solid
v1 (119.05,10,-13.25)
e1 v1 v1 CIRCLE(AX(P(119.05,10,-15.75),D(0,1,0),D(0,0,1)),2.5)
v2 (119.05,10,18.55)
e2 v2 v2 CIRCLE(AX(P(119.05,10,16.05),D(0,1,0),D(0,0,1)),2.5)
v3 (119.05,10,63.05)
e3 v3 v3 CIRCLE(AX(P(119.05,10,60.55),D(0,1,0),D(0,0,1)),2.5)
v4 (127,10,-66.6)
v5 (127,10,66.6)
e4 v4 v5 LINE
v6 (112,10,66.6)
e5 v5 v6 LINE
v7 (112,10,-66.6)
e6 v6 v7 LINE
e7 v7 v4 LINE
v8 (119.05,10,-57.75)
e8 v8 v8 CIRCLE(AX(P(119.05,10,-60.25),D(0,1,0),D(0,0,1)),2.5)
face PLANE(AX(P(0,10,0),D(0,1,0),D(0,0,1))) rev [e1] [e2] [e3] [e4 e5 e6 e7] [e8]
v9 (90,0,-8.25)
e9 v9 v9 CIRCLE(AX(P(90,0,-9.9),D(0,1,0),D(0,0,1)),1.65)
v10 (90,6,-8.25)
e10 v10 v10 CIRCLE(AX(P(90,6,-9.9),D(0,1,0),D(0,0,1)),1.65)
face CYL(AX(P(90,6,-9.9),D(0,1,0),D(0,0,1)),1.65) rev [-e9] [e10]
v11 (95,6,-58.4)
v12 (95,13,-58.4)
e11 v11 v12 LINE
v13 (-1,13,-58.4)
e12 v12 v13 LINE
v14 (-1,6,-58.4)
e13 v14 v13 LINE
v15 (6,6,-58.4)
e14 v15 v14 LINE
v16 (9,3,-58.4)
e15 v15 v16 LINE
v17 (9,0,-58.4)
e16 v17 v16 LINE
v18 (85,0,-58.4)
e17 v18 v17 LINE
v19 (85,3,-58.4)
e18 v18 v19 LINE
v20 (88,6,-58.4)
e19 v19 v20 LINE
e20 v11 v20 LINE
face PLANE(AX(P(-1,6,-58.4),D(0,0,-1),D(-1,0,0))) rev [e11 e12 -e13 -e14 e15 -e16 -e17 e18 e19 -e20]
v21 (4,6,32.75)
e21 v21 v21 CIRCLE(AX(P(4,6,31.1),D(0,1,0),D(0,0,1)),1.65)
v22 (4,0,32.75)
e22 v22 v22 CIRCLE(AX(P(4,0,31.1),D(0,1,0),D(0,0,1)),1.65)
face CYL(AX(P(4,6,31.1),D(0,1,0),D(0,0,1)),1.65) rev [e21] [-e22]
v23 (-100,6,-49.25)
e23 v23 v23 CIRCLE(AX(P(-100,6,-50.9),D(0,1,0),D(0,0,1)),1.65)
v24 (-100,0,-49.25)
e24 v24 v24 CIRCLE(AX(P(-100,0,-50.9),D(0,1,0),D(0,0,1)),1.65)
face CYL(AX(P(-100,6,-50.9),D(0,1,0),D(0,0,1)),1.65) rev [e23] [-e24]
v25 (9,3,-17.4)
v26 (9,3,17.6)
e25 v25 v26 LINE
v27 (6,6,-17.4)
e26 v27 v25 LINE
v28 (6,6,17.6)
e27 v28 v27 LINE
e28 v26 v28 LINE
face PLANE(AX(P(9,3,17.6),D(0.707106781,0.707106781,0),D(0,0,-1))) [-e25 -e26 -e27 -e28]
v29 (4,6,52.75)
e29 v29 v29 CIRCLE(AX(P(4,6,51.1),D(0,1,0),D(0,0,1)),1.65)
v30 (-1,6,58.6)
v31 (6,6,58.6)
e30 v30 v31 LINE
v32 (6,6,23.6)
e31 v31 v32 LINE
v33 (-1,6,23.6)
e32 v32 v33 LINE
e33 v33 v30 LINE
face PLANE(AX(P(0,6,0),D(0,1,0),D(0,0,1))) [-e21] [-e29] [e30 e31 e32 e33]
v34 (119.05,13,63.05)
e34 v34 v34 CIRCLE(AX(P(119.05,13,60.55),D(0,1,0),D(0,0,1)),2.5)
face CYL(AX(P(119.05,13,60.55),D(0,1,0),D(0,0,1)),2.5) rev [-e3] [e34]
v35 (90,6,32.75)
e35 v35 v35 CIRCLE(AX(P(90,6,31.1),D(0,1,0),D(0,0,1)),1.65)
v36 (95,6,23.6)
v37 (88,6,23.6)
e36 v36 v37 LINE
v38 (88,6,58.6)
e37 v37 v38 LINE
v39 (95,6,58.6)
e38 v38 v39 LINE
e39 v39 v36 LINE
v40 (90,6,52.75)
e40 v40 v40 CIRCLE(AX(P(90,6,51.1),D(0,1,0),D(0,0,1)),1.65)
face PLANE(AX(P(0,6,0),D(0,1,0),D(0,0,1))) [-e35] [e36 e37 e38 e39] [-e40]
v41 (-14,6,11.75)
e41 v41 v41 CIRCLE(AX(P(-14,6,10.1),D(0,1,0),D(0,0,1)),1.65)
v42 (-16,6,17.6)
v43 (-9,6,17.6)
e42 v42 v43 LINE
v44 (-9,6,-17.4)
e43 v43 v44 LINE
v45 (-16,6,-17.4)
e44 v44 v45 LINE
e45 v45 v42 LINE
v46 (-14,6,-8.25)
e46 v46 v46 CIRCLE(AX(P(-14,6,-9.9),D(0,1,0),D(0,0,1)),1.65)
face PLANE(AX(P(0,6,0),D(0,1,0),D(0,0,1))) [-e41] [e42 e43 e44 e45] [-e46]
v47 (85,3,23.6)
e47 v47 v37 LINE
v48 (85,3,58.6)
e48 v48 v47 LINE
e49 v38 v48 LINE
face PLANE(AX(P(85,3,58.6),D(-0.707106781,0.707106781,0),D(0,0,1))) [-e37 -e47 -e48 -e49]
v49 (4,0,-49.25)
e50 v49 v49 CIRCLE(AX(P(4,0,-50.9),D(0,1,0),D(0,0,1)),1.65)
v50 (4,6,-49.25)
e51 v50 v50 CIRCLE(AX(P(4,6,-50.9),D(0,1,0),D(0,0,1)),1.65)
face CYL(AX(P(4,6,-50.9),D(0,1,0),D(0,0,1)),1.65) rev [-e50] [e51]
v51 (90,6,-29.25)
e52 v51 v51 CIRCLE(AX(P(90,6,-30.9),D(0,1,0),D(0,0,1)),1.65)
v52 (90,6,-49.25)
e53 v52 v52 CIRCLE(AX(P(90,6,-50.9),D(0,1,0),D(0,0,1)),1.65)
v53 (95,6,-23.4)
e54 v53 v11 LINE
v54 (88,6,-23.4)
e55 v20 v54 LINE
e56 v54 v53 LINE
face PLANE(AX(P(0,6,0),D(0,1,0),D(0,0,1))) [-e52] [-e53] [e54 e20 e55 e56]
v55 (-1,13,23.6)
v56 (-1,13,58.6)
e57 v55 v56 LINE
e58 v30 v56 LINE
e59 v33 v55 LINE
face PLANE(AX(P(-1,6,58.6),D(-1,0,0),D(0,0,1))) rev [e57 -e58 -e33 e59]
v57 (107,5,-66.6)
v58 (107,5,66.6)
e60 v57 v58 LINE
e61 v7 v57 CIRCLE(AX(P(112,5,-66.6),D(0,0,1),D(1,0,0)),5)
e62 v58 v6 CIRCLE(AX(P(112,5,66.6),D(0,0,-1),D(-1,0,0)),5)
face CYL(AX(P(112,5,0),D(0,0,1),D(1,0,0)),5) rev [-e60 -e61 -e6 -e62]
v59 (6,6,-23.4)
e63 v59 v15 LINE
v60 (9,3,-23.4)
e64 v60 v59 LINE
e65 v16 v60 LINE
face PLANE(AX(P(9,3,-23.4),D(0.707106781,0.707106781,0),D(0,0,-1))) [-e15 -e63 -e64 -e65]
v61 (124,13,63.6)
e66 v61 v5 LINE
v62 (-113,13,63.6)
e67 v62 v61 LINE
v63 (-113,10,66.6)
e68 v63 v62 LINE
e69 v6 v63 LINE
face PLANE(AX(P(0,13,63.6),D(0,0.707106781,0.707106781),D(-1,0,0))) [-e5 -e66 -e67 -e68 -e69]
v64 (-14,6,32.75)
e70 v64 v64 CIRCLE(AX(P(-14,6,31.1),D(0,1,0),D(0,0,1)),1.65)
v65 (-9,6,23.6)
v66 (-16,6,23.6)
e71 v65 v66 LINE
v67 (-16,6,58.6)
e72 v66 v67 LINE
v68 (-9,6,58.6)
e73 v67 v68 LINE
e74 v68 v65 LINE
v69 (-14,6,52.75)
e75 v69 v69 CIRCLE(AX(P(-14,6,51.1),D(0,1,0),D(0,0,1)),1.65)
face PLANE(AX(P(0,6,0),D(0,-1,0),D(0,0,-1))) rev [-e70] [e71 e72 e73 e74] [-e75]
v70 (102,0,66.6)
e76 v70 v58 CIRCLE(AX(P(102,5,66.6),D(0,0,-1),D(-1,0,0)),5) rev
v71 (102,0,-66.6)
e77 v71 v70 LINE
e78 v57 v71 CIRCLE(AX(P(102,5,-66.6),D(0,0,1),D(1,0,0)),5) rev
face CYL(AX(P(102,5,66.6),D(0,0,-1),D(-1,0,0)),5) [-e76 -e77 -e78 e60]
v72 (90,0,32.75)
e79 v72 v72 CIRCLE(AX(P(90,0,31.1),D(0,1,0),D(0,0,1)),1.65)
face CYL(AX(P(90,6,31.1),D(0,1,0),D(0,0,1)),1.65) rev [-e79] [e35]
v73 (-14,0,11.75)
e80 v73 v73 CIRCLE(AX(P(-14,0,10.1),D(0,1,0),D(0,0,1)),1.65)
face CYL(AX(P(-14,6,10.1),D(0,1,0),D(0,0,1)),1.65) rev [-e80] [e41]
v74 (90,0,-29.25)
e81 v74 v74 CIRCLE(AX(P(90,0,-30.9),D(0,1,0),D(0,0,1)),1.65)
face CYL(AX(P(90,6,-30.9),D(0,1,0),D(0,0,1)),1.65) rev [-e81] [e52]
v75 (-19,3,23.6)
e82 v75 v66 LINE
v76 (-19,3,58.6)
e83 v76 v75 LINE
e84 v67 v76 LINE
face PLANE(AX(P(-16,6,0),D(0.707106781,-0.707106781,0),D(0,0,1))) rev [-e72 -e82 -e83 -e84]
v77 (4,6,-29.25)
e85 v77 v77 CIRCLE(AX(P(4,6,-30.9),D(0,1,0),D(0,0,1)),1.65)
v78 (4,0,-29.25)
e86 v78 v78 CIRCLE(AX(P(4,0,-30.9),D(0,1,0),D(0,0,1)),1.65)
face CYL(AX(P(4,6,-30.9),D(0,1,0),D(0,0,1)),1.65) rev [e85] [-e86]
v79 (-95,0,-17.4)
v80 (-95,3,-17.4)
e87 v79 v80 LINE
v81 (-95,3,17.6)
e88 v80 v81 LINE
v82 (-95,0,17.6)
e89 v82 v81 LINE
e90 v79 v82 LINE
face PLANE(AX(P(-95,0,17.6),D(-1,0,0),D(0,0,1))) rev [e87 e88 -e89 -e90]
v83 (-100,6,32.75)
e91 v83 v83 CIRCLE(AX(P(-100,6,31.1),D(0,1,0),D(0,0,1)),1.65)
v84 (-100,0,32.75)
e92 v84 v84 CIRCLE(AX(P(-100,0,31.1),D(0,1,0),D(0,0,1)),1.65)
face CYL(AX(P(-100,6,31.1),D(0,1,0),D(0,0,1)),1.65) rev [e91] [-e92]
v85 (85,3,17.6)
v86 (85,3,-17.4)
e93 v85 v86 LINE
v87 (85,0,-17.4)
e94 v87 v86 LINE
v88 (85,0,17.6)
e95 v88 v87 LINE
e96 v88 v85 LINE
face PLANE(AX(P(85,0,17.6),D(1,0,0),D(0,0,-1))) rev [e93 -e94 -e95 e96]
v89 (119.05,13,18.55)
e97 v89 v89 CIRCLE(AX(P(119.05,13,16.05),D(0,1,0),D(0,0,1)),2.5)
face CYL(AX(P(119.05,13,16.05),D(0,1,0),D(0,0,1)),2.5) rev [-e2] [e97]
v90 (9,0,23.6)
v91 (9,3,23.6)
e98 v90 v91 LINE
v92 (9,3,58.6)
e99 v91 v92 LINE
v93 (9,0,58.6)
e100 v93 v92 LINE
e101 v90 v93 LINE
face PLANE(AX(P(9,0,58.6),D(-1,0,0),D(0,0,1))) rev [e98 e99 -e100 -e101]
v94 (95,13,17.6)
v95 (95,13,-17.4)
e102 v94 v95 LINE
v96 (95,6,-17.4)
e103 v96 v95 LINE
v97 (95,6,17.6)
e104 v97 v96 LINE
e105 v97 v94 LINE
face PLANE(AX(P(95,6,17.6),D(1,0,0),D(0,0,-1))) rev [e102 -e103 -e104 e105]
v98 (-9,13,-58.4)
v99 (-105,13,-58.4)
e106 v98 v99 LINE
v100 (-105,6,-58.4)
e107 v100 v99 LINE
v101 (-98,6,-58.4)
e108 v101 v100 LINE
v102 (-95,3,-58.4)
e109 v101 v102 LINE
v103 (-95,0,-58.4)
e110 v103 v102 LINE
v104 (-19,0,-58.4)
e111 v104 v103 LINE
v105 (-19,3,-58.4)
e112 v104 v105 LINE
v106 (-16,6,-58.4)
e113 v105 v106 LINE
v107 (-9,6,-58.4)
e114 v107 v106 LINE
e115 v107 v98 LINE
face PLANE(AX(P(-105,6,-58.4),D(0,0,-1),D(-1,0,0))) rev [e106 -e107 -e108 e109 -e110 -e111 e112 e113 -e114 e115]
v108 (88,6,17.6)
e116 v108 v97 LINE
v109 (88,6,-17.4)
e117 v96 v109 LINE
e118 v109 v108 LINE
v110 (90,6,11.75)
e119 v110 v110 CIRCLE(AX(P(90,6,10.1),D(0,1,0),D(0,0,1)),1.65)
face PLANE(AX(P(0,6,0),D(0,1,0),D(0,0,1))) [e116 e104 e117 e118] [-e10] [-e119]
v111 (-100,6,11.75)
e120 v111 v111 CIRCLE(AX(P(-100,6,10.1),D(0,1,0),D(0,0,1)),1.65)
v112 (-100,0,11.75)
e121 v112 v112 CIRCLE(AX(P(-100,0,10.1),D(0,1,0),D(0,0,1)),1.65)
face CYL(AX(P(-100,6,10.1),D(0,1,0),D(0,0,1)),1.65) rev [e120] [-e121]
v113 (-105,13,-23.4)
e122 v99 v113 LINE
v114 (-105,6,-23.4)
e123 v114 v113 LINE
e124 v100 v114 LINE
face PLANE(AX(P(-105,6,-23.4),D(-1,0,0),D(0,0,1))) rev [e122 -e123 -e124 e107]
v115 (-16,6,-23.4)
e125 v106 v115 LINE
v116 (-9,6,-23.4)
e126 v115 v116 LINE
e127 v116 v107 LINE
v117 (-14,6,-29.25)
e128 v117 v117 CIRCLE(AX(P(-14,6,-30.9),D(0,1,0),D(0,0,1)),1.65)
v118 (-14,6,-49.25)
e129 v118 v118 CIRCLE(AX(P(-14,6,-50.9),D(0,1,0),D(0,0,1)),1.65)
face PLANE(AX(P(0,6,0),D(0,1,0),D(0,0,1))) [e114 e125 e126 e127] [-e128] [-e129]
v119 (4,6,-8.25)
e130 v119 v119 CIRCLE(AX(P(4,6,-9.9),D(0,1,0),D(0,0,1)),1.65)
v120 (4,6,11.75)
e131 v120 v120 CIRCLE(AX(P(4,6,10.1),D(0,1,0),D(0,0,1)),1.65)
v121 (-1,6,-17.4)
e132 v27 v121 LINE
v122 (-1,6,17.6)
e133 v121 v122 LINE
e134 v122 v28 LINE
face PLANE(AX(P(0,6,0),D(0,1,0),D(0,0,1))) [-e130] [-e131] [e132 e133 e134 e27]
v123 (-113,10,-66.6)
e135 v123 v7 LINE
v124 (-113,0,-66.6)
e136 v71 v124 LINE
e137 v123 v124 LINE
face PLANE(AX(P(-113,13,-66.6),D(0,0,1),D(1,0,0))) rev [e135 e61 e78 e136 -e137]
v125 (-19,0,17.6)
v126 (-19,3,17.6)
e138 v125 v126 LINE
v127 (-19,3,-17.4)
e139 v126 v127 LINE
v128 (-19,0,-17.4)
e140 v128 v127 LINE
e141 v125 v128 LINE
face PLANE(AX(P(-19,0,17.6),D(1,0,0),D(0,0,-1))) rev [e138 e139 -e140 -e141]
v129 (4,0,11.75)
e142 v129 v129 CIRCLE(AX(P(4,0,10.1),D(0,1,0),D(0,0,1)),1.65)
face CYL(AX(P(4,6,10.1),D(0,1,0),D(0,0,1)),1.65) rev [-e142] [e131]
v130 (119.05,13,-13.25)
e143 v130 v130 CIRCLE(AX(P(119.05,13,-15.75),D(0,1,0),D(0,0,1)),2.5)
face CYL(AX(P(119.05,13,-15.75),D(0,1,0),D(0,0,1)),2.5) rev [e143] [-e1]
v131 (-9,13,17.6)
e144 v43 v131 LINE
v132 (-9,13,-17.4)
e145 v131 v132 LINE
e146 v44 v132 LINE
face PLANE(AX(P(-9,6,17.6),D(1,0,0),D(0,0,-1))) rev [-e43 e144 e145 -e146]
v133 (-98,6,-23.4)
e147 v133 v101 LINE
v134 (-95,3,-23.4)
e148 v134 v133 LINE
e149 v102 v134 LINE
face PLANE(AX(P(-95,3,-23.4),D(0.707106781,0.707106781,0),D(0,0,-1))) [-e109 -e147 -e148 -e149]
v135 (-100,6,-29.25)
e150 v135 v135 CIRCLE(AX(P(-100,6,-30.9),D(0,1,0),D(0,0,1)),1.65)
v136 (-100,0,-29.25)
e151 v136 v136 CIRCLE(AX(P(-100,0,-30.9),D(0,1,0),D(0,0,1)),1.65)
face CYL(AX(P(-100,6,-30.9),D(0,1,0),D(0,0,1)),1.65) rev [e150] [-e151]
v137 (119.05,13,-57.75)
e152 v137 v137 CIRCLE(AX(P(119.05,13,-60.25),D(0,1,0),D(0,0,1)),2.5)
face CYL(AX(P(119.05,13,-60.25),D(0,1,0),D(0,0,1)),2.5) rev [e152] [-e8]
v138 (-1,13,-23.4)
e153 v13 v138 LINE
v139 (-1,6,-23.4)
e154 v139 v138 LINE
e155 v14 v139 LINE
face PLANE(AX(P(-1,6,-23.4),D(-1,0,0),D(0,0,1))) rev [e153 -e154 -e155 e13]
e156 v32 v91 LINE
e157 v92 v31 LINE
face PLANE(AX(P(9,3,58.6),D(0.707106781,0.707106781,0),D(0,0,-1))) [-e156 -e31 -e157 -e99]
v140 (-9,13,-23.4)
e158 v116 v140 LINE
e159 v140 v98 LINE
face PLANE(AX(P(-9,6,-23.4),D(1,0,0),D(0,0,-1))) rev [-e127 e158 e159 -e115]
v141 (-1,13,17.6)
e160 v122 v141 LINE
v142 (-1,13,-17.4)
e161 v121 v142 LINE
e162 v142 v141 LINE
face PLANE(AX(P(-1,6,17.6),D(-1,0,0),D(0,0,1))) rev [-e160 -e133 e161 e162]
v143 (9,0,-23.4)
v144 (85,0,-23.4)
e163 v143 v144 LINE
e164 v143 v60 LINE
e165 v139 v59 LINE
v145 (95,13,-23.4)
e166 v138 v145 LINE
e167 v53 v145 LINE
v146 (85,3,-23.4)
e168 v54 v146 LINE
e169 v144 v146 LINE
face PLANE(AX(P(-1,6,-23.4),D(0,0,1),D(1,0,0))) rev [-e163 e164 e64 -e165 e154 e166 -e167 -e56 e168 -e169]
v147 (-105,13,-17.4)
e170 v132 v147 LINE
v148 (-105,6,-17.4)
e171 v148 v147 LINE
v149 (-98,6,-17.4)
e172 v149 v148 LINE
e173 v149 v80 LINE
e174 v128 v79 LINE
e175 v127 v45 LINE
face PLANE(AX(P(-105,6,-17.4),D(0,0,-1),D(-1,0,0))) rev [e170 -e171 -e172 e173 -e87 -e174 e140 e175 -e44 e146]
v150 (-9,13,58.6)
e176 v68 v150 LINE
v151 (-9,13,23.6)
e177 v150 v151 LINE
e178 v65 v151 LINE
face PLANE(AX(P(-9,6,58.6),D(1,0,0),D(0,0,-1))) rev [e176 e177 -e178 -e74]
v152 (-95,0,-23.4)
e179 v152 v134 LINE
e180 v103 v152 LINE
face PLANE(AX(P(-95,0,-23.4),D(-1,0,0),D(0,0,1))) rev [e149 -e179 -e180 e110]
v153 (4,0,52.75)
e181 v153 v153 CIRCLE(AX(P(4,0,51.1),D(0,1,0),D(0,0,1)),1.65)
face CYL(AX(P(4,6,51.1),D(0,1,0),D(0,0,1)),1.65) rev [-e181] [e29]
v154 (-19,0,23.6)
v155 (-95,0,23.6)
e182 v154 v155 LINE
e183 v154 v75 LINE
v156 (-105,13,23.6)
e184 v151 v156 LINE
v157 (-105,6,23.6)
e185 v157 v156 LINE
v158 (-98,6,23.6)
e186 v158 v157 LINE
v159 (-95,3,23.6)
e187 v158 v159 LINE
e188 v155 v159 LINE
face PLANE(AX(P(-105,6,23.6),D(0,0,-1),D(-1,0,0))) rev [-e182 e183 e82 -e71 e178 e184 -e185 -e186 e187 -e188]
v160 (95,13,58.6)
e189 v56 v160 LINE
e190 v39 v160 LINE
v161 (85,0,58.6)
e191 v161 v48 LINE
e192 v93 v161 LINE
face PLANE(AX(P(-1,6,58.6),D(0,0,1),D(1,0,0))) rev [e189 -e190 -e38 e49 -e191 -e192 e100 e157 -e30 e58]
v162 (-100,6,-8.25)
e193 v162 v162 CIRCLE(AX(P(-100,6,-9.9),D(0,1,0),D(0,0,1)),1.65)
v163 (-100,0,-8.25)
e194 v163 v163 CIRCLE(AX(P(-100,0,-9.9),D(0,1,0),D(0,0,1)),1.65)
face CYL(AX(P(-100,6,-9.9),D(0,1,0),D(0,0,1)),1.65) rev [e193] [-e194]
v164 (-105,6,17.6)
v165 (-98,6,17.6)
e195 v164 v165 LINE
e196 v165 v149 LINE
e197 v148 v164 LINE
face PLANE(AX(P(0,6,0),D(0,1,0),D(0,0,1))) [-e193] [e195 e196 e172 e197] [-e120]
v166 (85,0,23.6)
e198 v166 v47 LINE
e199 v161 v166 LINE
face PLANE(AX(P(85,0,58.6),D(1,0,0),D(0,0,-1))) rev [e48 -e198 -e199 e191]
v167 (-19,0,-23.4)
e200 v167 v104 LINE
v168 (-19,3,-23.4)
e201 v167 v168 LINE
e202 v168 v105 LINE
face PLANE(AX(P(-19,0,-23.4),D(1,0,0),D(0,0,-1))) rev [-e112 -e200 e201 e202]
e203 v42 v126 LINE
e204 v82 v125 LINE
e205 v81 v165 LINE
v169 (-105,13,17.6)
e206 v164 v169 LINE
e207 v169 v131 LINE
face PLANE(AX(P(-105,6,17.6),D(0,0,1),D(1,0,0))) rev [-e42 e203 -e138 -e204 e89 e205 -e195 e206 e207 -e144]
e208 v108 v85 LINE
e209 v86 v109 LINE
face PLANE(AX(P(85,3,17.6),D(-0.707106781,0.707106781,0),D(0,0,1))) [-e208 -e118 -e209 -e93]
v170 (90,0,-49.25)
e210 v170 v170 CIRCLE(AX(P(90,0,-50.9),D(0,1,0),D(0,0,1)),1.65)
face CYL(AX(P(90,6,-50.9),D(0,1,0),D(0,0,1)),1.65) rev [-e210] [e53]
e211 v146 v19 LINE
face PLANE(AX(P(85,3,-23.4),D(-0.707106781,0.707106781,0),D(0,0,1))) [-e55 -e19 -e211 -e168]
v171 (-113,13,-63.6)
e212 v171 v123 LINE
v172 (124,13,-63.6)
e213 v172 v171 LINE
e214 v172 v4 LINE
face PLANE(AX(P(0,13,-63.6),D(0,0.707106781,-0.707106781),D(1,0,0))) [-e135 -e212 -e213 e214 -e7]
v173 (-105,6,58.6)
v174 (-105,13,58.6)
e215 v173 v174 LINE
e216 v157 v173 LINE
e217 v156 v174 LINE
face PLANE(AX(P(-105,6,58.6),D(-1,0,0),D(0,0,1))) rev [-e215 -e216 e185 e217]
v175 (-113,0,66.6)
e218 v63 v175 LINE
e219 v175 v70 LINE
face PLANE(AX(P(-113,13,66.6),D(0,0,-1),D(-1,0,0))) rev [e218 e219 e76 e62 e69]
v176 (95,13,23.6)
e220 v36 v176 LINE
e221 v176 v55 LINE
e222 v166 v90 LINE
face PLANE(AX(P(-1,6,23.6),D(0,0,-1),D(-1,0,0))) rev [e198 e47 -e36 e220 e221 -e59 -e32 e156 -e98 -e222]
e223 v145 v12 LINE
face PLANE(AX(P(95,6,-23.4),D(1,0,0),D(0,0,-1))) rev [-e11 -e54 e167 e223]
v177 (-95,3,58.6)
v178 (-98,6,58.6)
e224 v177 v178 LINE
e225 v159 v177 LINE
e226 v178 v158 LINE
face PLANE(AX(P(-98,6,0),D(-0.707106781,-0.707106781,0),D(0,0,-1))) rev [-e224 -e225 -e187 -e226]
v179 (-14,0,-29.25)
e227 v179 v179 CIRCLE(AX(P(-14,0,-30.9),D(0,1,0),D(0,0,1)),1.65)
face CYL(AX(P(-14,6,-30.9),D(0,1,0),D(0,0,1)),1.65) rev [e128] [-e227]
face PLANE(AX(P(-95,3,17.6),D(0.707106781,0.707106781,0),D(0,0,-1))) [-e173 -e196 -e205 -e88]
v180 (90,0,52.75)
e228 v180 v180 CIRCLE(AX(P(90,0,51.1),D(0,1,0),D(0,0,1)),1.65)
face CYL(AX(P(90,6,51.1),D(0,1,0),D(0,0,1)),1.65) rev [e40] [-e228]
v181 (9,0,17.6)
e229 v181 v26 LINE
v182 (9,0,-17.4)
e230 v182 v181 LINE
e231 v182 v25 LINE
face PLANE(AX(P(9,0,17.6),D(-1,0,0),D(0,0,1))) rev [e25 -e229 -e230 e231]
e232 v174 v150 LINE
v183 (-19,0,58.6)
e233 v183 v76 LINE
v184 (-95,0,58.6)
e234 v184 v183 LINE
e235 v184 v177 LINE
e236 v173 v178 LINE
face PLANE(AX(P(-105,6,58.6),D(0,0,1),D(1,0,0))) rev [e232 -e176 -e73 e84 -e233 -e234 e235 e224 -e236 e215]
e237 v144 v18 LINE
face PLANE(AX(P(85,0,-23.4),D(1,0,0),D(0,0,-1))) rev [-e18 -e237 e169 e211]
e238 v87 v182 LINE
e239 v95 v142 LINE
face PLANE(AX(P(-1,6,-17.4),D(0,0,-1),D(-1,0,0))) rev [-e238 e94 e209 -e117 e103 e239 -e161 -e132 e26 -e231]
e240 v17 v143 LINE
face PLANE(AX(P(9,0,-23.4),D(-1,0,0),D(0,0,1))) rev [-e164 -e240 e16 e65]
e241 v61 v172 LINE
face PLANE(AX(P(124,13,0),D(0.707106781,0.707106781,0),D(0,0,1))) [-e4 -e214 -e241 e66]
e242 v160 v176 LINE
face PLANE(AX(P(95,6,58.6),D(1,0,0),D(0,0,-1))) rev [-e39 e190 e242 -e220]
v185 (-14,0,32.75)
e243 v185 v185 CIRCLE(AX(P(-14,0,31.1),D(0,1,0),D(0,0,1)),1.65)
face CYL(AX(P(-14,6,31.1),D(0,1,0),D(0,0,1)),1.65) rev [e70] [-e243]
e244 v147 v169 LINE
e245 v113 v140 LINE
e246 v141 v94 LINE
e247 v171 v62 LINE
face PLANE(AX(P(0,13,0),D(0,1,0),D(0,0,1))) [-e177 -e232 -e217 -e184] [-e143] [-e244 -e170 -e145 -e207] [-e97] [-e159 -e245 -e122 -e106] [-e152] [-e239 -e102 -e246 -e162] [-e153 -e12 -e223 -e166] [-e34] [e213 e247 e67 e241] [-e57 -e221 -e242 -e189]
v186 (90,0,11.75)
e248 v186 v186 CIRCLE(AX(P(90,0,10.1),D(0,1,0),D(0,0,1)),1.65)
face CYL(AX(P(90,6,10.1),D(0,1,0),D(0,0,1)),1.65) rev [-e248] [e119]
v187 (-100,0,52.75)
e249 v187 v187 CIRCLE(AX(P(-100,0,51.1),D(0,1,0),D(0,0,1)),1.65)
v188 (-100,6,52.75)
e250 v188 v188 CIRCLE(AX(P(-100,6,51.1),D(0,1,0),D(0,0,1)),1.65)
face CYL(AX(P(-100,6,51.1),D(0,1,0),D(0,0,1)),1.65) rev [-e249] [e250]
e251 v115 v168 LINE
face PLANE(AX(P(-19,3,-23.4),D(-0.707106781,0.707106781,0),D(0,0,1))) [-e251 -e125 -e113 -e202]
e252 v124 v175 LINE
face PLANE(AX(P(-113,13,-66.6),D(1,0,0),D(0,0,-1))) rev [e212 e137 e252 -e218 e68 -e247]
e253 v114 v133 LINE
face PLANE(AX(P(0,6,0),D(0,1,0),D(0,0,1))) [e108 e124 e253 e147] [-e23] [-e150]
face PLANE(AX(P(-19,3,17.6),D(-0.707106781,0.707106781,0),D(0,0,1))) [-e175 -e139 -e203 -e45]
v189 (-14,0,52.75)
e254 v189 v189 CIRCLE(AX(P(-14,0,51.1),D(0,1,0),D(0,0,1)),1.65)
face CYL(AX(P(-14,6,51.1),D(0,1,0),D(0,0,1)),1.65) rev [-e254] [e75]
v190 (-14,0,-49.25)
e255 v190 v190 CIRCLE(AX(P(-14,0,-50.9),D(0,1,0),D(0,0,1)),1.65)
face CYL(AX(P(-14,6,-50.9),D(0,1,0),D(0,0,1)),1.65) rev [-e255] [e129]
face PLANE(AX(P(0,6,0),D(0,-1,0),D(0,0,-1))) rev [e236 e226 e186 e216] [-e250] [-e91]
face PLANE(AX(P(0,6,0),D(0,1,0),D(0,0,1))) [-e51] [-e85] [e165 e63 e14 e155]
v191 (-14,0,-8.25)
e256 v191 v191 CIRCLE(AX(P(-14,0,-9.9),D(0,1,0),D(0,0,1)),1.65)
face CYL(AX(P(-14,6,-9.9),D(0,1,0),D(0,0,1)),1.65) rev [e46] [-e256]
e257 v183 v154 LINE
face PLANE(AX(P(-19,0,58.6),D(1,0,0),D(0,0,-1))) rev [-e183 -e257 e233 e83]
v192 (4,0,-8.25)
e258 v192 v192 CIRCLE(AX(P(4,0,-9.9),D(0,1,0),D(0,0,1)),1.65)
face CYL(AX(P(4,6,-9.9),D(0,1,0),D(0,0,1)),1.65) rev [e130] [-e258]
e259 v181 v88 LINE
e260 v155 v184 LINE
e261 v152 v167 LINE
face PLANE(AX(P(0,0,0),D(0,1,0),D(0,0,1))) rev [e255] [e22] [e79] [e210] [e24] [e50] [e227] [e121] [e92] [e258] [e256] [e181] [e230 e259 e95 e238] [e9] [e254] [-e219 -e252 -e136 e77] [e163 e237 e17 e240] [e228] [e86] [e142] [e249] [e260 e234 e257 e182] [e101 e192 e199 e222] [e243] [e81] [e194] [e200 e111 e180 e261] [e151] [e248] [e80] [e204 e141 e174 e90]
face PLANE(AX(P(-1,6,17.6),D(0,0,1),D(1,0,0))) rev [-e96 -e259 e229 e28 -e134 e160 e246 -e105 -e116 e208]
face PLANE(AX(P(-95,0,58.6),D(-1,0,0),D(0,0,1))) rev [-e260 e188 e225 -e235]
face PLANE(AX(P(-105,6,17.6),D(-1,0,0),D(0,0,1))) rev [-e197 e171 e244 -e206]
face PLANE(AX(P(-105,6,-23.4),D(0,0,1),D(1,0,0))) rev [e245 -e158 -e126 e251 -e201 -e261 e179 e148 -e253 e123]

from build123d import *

# Parameters (mm, degrees)
SKETCH1_W                      = 240
SKETCH1_H                      = 133.2
BOSS_EXTRUDE1_DEPTH            = 13
SKETCH32_W                     = 20
SKETCH32_H                     = 133.2
CUT_EXTRUDE10_DEPTH            = 10
FILLET1_START                  = -68
FILLET1_DEPTH                  = 136
FILLET1_START_2                = -66.6
FILLET1_2_DEPTH                = 133.2
M6X1_0_TAPPED_HOLE1_D          = 5
M6X1_0_TAPPED_HOLE1_DEPTH      = 15
M6X1_0_TAPPED_HOLE1_TIP        = 1.502151548
SKETCH36_W                     = 96
SKETCH36_H                     = 35
CUT_EXTRUDE11_DEPTH            = 7
SKETCH37_W                     = 76
SKETCH37_H                     = 35
CUT_EXTRUDE12_DEPTH            = 144.991527529
M4X0_7_TAPPED_HOLE1_AT_2_COUNT = 2
M4X0_7_TAPPED_HOLE1_AT_2_PITCH = 20
M4X0_7_TAPPED_HOLE1_AT_3_COUNT = 2
M4X0_7_TAPPED_HOLE1_AT_3_PITCH = 86
M4X0_7_TAPPED_HOLE1_AT_4_COUNT = 2
M4X0_7_TAPPED_HOLE1_AT_4_PITCH = 88.294960219
LPATTERN1_COUNT                = 3
LPATTERN1_PITCH                = 41
LPATTERN1_COUNT_DIR2           = 2
LPATTERN1_PITCH_DIR2           = 104
CHAMFER1_SIZE                  = 3


with BuildPart() as part:
    # Sketch1 → Boss-Extrude1 (new body)
    with BuildSketch(Plane(origin=(0, 0, 0), x_dir=(1, 0, 0), z_dir=(0, 1, 0))):
        with Locations((7, 0)):
            Rectangle(SKETCH1_W, SKETCH1_H)
    extrude(amount=BOSS_EXTRUDE1_DEPTH)

    # Sketch32 → Cut-Extrude10 (cut)
    with BuildSketch(Plane.XZ):
        with Locations((117, 0)):
            Rectangle(SKETCH32_W, SKETCH32_H)
    extrude(amount=-CUT_EXTRUDE10_DEPTH, mode=Mode.SUBTRACT)

    # Fillet1: read off the stored shape, not the designer's step
    # Fillet1 outline → Fillet1 (cut)
    with BuildSketch(Plane.XY.offset(FILLET1_START)):
        with BuildLine():
            Line((107, 0), (107, 5))
            ThreePointArc((107, 5), (105.535533906, 1.464466094), (102, 0))
            Line((102, 0), (107, 0))
        make_face()
    extrude(amount=FILLET1_DEPTH, mode=Mode.SUBTRACT)

    # Fillet1 2 outline → Fillet1 2 (add)
    with BuildSketch(Plane.XY.offset(FILLET1_START_2)):
        with BuildLine():
            ThreePointArc((107, 5), (108.464466094, 8.535533906), (112, 10))
            Line((112, 10), (107, 10))
            Line((107, 10), (107, 5))
        make_face()
    extrude(amount=FILLET1_2_DEPTH)

    # M6x1.0 Tapped Hole1
    with Locations(Plane(origin=(0, 13, 0), x_dir=(1, 0, 0), z_dir=(0, 1, 0))):
        with Locations((119.05, 60.25), (119.05, 15.75), (119.05, -16.05), (119.05, -60.55)):
            Hole(M6X1_0_TAPPED_HOLE1_D / 2, depth=M6X1_0_TAPPED_HOLE1_DEPTH)
            with Locations((0, 0, -(M6X1_0_TAPPED_HOLE1_DEPTH + M6X1_0_TAPPED_HOLE1_TIP / 2))):  # 118° drill point
                Cone(0, M6X1_0_TAPPED_HOLE1_D / 2, M6X1_0_TAPPED_HOLE1_TIP, mode=Mode.SUBTRACT)

    # Sketch36 → Cut-Extrude11 (cut)
    with BuildSketch(Plane(origin=(0, 13, 0), x_dir=(1, 0, 0), z_dir=(0, 1, 0))):
        with Locations((-57, -41.1)):
            Rectangle(SKETCH36_W, SKETCH36_H)
        with Locations((-57, -0.1)):
            Rectangle(SKETCH36_W, SKETCH36_H)
        with Locations((-57, 40.9)):
            Rectangle(SKETCH36_W, SKETCH36_H)
        with Locations((47, 40.9)):
            Rectangle(SKETCH36_W, SKETCH36_H)
        with Locations((47, -0.1)):
            Rectangle(SKETCH36_W, SKETCH36_H)
        with Locations((47, -41.1)):
            Rectangle(SKETCH36_W, SKETCH36_H)
    extrude(amount=-CUT_EXTRUDE11_DEPTH, mode=Mode.SUBTRACT)

    # Sketch37 → Cut-Extrude12 (cut, through all)
    with BuildSketch(Plane(origin=(0, 13, 0), x_dir=(1, 0, 0), z_dir=(0, 1, 0))):
        with Locations((-57, -41.1)):
            Rectangle(SKETCH37_W, SKETCH37_H)
        with Locations((-57, -0.1)):
            Rectangle(SKETCH37_W, SKETCH37_H)
        with Locations((-57, 40.9)):
            Rectangle(SKETCH37_W, SKETCH37_H)
        with Locations((47, -0.1)):
            Rectangle(SKETCH37_W, SKETCH37_H)
        with Locations((47, -41.1)):
            Rectangle(SKETCH37_W, SKETCH37_H)
        with Locations((47, 40.9)):
            Rectangle(SKETCH37_W, SKETCH37_H)
    extrude(amount=-CUT_EXTRUDE12_DEPTH, mode=Mode.SUBTRACT)

    # Sketch39 → M4x0.7 Tapped Hole1 (revolve, cut)
    with BuildSketch(Plane(origin=(-100, 6, 51.1), x_dir=(0, 0, 1), z_dir=(1, 0, 0))):
        Polygon((0, 0), (0, 11.091420021), (1.65, 10.1), (1.65, 0), align=None)
    m4x0_7_tapped_hole1 = revolve(axis=Axis((-100, 12.35, 51.1), (0, -1, 0)), mode=Mode.SUBTRACT)

    # M4x0.7 Tapped Hole1 at 2: M4x0.7 Tapped Hole1 ×2
    with Locations(*[(0, 0, -i * M4X0_7_TAPPED_HOLE1_AT_2_PITCH) for i in range(1, M4X0_7_TAPPED_HOLE1_AT_2_COUNT)]):
        add(m4x0_7_tapped_hole1, mode=Mode.SUBTRACT)

    # M4x0.7 Tapped Hole1 at 3: M4x0.7 Tapped Hole1 ×2
    with Locations(*[(i * M4X0_7_TAPPED_HOLE1_AT_3_PITCH, 0, 0) for i in range(1, M4X0_7_TAPPED_HOLE1_AT_3_COUNT)]):
        add(m4x0_7_tapped_hole1, mode=Mode.SUBTRACT)

    # M4x0.7 Tapped Hole1 at 4: M4x0.7 Tapped Hole1 ×2
    with Locations(*[Vector(0.9740080270391964, 0, -0.22651349466027837) * (i * M4X0_7_TAPPED_HOLE1_AT_4_PITCH) for i in range(1, M4X0_7_TAPPED_HOLE1_AT_4_COUNT)]):
        add(m4x0_7_tapped_hole1, mode=Mode.SUBTRACT)

    # LPattern1: M4x0.7 Tapped Hole1 3 × 2
    with Locations(*[(j * LPATTERN1_PITCH_DIR2, 0, -i * LPATTERN1_PITCH) for i in range(LPATTERN1_COUNT) for j in range(LPATTERN1_COUNT_DIR2) if (i, j) != (0, 0)]):
        add(m4x0_7_tapped_hole1, mode=Mode.SUBTRACT)

    # LPattern1 copy 1 sketch → LPattern1 copy 1 (revolve, cut)
    with BuildSketch(Plane(origin=(4, 6, 31.1), x_dir=(0, 0, 1), z_dir=(1, 0, 0))):
        Polygon((0, 0), (0, 11.091420021), (1.65, 10.1), (1.65, 0), align=None)
    revolve(axis=Axis((4, 12.35, 31.1), (0, -1, 0)), mode=Mode.SUBTRACT)

    # LPattern1 copy 2 sketch → LPattern1 copy 2 (revolve, cut)
    with BuildSketch(Plane(origin=(-100, 6, -9.9), x_dir=(0, 0, 1), z_dir=(1, 0, 0))):
        Polygon((0, 0), (0, 11.091420021), (1.65, 10.1), (1.65, 0), align=None)
    revolve(axis=Axis((-100, 12.35, -9.9), (0, -1, 0)), mode=Mode.SUBTRACT)

    # LPattern1 copy 3 sketch → LPattern1 copy 3 (revolve, cut)
    with BuildSketch(Plane(origin=(4, 6, -9.9), x_dir=(0, 0, 1), z_dir=(1, 0, 0))):
        Polygon((0, 0), (0, 11.091420021), (1.65, 10.1), (1.65, 0), align=None)
    revolve(axis=Axis((4, 12.35, -9.9), (0, -1, 0)), mode=Mode.SUBTRACT)

    # LPattern1 copy 4 sketch → LPattern1 copy 4 (revolve, cut)
    with BuildSketch(Plane(origin=(-100, 6, -50.9), x_dir=(0, 0, 1), z_dir=(1, 0, 0))):
        Polygon((0, 0), (0, 11.091420021), (1.65, 10.1), (1.65, 0), align=None)
    revolve(axis=Axis((-100, 12.35, -50.9), (0, -1, 0)), mode=Mode.SUBTRACT)

    # LPattern1 copy 5 sketch → LPattern1 copy 5 (revolve, cut)
    with BuildSketch(Plane(origin=(4, 6, -50.9), x_dir=(0, 0, 1), z_dir=(1, 0, 0))):
        Polygon((0, 0), (0, 11.091420021), (1.65, 10.1), (1.65, 0), align=None)
    revolve(axis=Axis((4, 12.35, -50.9), (0, -1, 0)), mode=Mode.SUBTRACT)

    # LPattern1 copy 6 sketch → LPattern1 copy 6 (revolve, cut)
    with BuildSketch(Plane(origin=(90, 6, 51.1), x_dir=(0, 0, 1), z_dir=(1, 0, 0))):
        Polygon((0, 0), (0, 11.091420021), (1.65, 10.1), (1.65, 0), align=None)
    revolve(axis=Axis((90, 12.35, 51.1), (0, -1, 0)), mode=Mode.SUBTRACT)

    # LPattern1 copy 7 sketch → LPattern1 copy 7 (revolve, cut)
    with BuildSketch(Plane(origin=(-14, 6, 10.1), x_dir=(0, 0, 1), z_dir=(1, 0, 0))):
        Polygon((0, 0), (0, 11.091420021), (1.65, 10.1), (1.65, 0), align=None)
    revolve(axis=Axis((-14, 12.35, 10.1), (0, -1, 0)), mode=Mode.SUBTRACT)

    # LPattern1 copy 8 sketch → LPattern1 copy 8 (revolve, cut)
    with BuildSketch(Plane(origin=(90, 6, 10.1), x_dir=(0, 0, 1), z_dir=(1, 0, 0))):
        Polygon((0, 0), (0, 11.091420021), (1.65, 10.1), (1.65, 0), align=None)
    revolve(axis=Axis((90, 12.35, 10.1), (0, -1, 0)), mode=Mode.SUBTRACT)

    # LPattern1 copy 9 sketch → LPattern1 copy 9 (revolve, cut)
    with BuildSketch(Plane(origin=(-14, 6, -30.9), x_dir=(0, 0, 1), z_dir=(1, 0, 0))):
        Polygon((0, 0), (0, 11.091420021), (1.65, 10.1), (1.65, 0), align=None)
    revolve(axis=Axis((-14, 12.35, -30.9), (0, -1, 0)), mode=Mode.SUBTRACT)

    # LPattern1 copy 10 sketch → LPattern1 copy 10 (revolve, cut)
    with BuildSketch(Plane(origin=(90, 6, -30.9), x_dir=(0, 0, 1), z_dir=(1, 0, 0))):
        Polygon((0, 0), (0, 11.091420021), (1.65, 10.1), (1.65, 0), align=None)
    revolve(axis=Axis((90, 12.35, -30.9), (0, -1, 0)), mode=Mode.SUBTRACT)

    # LPattern1 copy 11 sketch → LPattern1 copy 11 (revolve, cut)
    with BuildSketch(Plane(origin=(90, 6, 31.1), x_dir=(0, 0, 1), z_dir=(1, 0, 0))):
        Polygon((0, 0), (0, 11.091420021), (1.65, 10.1), (1.65, 0), align=None)
    revolve(axis=Axis((90, 12.35, 31.1), (0, -1, 0)), mode=Mode.SUBTRACT)

    # LPattern1 copy 12 sketch → LPattern1 copy 12 (revolve, cut)
    with BuildSketch(Plane(origin=(-14, 6, -9.9), x_dir=(0, 0, 1), z_dir=(1, 0, 0))):
        Polygon((0, 0), (0, 11.091420021), (1.65, 10.1), (1.65, 0), align=None)
    revolve(axis=Axis((-14, 12.35, -9.9), (0, -1, 0)), mode=Mode.SUBTRACT)

    # LPattern1 copy 13 sketch → LPattern1 copy 13 (revolve, cut)
    with BuildSketch(Plane(origin=(90, 6, -9.9), x_dir=(0, 0, 1), z_dir=(1, 0, 0))):
        Polygon((0, 0), (0, 11.091420021), (1.65, 10.1), (1.65, 0), align=None)
    revolve(axis=Axis((90, 12.35, -9.9), (0, -1, 0)), mode=Mode.SUBTRACT)

    # LPattern1 copy 14 sketch → LPattern1 copy 14 (revolve, cut)
    with BuildSketch(Plane(origin=(-14, 6, -50.9), x_dir=(0, 0, 1), z_dir=(1, 0, 0))):
        Polygon((0, 0), (0, 11.091420021), (1.65, 10.1), (1.65, 0), align=None)
    revolve(axis=Axis((-14, 12.35, -50.9), (0, -1, 0)), mode=Mode.SUBTRACT)

    # LPattern1 copy 15 sketch → LPattern1 copy 15 (revolve, cut)
    with BuildSketch(Plane(origin=(90, 6, -50.9), x_dir=(0, 0, 1), z_dir=(1, 0, 0))):
        Polygon((0, 0), (0, 11.091420021), (1.65, 10.1), (1.65, 0), align=None)
    revolve(axis=Axis((90, 12.35, -50.9), (0, -1, 0)), mode=Mode.SUBTRACT)

    # Chamfer1
    chamfer1_edges = [part.edges().sort_by_distance(p)[0] for p in [
        (-95, 6, -40.9),
        (-19, 6, -40.9),
        (-95, 6, 0.1),
        (-19, 6, 0.1),
        (-19, 6, 41.1),
        (-95, 6, 41.1),
        (9, 6, -40.9),
        (85, 6, -40.9),
        (85, 6, 0.1),
        (9, 6, 0.1),
        (9, 6, 41.1),
        (85, 6, 41.1),
        (7, 13, -66.6),
        (127, 13, 0),
        (7, 13, 66.6),
    ]]
    chamfer(chamfer1_edges, length=CHAMFER1_SIZE - 0.0001)  # a hair under: the kernel refuses the full size


solid = part.part
